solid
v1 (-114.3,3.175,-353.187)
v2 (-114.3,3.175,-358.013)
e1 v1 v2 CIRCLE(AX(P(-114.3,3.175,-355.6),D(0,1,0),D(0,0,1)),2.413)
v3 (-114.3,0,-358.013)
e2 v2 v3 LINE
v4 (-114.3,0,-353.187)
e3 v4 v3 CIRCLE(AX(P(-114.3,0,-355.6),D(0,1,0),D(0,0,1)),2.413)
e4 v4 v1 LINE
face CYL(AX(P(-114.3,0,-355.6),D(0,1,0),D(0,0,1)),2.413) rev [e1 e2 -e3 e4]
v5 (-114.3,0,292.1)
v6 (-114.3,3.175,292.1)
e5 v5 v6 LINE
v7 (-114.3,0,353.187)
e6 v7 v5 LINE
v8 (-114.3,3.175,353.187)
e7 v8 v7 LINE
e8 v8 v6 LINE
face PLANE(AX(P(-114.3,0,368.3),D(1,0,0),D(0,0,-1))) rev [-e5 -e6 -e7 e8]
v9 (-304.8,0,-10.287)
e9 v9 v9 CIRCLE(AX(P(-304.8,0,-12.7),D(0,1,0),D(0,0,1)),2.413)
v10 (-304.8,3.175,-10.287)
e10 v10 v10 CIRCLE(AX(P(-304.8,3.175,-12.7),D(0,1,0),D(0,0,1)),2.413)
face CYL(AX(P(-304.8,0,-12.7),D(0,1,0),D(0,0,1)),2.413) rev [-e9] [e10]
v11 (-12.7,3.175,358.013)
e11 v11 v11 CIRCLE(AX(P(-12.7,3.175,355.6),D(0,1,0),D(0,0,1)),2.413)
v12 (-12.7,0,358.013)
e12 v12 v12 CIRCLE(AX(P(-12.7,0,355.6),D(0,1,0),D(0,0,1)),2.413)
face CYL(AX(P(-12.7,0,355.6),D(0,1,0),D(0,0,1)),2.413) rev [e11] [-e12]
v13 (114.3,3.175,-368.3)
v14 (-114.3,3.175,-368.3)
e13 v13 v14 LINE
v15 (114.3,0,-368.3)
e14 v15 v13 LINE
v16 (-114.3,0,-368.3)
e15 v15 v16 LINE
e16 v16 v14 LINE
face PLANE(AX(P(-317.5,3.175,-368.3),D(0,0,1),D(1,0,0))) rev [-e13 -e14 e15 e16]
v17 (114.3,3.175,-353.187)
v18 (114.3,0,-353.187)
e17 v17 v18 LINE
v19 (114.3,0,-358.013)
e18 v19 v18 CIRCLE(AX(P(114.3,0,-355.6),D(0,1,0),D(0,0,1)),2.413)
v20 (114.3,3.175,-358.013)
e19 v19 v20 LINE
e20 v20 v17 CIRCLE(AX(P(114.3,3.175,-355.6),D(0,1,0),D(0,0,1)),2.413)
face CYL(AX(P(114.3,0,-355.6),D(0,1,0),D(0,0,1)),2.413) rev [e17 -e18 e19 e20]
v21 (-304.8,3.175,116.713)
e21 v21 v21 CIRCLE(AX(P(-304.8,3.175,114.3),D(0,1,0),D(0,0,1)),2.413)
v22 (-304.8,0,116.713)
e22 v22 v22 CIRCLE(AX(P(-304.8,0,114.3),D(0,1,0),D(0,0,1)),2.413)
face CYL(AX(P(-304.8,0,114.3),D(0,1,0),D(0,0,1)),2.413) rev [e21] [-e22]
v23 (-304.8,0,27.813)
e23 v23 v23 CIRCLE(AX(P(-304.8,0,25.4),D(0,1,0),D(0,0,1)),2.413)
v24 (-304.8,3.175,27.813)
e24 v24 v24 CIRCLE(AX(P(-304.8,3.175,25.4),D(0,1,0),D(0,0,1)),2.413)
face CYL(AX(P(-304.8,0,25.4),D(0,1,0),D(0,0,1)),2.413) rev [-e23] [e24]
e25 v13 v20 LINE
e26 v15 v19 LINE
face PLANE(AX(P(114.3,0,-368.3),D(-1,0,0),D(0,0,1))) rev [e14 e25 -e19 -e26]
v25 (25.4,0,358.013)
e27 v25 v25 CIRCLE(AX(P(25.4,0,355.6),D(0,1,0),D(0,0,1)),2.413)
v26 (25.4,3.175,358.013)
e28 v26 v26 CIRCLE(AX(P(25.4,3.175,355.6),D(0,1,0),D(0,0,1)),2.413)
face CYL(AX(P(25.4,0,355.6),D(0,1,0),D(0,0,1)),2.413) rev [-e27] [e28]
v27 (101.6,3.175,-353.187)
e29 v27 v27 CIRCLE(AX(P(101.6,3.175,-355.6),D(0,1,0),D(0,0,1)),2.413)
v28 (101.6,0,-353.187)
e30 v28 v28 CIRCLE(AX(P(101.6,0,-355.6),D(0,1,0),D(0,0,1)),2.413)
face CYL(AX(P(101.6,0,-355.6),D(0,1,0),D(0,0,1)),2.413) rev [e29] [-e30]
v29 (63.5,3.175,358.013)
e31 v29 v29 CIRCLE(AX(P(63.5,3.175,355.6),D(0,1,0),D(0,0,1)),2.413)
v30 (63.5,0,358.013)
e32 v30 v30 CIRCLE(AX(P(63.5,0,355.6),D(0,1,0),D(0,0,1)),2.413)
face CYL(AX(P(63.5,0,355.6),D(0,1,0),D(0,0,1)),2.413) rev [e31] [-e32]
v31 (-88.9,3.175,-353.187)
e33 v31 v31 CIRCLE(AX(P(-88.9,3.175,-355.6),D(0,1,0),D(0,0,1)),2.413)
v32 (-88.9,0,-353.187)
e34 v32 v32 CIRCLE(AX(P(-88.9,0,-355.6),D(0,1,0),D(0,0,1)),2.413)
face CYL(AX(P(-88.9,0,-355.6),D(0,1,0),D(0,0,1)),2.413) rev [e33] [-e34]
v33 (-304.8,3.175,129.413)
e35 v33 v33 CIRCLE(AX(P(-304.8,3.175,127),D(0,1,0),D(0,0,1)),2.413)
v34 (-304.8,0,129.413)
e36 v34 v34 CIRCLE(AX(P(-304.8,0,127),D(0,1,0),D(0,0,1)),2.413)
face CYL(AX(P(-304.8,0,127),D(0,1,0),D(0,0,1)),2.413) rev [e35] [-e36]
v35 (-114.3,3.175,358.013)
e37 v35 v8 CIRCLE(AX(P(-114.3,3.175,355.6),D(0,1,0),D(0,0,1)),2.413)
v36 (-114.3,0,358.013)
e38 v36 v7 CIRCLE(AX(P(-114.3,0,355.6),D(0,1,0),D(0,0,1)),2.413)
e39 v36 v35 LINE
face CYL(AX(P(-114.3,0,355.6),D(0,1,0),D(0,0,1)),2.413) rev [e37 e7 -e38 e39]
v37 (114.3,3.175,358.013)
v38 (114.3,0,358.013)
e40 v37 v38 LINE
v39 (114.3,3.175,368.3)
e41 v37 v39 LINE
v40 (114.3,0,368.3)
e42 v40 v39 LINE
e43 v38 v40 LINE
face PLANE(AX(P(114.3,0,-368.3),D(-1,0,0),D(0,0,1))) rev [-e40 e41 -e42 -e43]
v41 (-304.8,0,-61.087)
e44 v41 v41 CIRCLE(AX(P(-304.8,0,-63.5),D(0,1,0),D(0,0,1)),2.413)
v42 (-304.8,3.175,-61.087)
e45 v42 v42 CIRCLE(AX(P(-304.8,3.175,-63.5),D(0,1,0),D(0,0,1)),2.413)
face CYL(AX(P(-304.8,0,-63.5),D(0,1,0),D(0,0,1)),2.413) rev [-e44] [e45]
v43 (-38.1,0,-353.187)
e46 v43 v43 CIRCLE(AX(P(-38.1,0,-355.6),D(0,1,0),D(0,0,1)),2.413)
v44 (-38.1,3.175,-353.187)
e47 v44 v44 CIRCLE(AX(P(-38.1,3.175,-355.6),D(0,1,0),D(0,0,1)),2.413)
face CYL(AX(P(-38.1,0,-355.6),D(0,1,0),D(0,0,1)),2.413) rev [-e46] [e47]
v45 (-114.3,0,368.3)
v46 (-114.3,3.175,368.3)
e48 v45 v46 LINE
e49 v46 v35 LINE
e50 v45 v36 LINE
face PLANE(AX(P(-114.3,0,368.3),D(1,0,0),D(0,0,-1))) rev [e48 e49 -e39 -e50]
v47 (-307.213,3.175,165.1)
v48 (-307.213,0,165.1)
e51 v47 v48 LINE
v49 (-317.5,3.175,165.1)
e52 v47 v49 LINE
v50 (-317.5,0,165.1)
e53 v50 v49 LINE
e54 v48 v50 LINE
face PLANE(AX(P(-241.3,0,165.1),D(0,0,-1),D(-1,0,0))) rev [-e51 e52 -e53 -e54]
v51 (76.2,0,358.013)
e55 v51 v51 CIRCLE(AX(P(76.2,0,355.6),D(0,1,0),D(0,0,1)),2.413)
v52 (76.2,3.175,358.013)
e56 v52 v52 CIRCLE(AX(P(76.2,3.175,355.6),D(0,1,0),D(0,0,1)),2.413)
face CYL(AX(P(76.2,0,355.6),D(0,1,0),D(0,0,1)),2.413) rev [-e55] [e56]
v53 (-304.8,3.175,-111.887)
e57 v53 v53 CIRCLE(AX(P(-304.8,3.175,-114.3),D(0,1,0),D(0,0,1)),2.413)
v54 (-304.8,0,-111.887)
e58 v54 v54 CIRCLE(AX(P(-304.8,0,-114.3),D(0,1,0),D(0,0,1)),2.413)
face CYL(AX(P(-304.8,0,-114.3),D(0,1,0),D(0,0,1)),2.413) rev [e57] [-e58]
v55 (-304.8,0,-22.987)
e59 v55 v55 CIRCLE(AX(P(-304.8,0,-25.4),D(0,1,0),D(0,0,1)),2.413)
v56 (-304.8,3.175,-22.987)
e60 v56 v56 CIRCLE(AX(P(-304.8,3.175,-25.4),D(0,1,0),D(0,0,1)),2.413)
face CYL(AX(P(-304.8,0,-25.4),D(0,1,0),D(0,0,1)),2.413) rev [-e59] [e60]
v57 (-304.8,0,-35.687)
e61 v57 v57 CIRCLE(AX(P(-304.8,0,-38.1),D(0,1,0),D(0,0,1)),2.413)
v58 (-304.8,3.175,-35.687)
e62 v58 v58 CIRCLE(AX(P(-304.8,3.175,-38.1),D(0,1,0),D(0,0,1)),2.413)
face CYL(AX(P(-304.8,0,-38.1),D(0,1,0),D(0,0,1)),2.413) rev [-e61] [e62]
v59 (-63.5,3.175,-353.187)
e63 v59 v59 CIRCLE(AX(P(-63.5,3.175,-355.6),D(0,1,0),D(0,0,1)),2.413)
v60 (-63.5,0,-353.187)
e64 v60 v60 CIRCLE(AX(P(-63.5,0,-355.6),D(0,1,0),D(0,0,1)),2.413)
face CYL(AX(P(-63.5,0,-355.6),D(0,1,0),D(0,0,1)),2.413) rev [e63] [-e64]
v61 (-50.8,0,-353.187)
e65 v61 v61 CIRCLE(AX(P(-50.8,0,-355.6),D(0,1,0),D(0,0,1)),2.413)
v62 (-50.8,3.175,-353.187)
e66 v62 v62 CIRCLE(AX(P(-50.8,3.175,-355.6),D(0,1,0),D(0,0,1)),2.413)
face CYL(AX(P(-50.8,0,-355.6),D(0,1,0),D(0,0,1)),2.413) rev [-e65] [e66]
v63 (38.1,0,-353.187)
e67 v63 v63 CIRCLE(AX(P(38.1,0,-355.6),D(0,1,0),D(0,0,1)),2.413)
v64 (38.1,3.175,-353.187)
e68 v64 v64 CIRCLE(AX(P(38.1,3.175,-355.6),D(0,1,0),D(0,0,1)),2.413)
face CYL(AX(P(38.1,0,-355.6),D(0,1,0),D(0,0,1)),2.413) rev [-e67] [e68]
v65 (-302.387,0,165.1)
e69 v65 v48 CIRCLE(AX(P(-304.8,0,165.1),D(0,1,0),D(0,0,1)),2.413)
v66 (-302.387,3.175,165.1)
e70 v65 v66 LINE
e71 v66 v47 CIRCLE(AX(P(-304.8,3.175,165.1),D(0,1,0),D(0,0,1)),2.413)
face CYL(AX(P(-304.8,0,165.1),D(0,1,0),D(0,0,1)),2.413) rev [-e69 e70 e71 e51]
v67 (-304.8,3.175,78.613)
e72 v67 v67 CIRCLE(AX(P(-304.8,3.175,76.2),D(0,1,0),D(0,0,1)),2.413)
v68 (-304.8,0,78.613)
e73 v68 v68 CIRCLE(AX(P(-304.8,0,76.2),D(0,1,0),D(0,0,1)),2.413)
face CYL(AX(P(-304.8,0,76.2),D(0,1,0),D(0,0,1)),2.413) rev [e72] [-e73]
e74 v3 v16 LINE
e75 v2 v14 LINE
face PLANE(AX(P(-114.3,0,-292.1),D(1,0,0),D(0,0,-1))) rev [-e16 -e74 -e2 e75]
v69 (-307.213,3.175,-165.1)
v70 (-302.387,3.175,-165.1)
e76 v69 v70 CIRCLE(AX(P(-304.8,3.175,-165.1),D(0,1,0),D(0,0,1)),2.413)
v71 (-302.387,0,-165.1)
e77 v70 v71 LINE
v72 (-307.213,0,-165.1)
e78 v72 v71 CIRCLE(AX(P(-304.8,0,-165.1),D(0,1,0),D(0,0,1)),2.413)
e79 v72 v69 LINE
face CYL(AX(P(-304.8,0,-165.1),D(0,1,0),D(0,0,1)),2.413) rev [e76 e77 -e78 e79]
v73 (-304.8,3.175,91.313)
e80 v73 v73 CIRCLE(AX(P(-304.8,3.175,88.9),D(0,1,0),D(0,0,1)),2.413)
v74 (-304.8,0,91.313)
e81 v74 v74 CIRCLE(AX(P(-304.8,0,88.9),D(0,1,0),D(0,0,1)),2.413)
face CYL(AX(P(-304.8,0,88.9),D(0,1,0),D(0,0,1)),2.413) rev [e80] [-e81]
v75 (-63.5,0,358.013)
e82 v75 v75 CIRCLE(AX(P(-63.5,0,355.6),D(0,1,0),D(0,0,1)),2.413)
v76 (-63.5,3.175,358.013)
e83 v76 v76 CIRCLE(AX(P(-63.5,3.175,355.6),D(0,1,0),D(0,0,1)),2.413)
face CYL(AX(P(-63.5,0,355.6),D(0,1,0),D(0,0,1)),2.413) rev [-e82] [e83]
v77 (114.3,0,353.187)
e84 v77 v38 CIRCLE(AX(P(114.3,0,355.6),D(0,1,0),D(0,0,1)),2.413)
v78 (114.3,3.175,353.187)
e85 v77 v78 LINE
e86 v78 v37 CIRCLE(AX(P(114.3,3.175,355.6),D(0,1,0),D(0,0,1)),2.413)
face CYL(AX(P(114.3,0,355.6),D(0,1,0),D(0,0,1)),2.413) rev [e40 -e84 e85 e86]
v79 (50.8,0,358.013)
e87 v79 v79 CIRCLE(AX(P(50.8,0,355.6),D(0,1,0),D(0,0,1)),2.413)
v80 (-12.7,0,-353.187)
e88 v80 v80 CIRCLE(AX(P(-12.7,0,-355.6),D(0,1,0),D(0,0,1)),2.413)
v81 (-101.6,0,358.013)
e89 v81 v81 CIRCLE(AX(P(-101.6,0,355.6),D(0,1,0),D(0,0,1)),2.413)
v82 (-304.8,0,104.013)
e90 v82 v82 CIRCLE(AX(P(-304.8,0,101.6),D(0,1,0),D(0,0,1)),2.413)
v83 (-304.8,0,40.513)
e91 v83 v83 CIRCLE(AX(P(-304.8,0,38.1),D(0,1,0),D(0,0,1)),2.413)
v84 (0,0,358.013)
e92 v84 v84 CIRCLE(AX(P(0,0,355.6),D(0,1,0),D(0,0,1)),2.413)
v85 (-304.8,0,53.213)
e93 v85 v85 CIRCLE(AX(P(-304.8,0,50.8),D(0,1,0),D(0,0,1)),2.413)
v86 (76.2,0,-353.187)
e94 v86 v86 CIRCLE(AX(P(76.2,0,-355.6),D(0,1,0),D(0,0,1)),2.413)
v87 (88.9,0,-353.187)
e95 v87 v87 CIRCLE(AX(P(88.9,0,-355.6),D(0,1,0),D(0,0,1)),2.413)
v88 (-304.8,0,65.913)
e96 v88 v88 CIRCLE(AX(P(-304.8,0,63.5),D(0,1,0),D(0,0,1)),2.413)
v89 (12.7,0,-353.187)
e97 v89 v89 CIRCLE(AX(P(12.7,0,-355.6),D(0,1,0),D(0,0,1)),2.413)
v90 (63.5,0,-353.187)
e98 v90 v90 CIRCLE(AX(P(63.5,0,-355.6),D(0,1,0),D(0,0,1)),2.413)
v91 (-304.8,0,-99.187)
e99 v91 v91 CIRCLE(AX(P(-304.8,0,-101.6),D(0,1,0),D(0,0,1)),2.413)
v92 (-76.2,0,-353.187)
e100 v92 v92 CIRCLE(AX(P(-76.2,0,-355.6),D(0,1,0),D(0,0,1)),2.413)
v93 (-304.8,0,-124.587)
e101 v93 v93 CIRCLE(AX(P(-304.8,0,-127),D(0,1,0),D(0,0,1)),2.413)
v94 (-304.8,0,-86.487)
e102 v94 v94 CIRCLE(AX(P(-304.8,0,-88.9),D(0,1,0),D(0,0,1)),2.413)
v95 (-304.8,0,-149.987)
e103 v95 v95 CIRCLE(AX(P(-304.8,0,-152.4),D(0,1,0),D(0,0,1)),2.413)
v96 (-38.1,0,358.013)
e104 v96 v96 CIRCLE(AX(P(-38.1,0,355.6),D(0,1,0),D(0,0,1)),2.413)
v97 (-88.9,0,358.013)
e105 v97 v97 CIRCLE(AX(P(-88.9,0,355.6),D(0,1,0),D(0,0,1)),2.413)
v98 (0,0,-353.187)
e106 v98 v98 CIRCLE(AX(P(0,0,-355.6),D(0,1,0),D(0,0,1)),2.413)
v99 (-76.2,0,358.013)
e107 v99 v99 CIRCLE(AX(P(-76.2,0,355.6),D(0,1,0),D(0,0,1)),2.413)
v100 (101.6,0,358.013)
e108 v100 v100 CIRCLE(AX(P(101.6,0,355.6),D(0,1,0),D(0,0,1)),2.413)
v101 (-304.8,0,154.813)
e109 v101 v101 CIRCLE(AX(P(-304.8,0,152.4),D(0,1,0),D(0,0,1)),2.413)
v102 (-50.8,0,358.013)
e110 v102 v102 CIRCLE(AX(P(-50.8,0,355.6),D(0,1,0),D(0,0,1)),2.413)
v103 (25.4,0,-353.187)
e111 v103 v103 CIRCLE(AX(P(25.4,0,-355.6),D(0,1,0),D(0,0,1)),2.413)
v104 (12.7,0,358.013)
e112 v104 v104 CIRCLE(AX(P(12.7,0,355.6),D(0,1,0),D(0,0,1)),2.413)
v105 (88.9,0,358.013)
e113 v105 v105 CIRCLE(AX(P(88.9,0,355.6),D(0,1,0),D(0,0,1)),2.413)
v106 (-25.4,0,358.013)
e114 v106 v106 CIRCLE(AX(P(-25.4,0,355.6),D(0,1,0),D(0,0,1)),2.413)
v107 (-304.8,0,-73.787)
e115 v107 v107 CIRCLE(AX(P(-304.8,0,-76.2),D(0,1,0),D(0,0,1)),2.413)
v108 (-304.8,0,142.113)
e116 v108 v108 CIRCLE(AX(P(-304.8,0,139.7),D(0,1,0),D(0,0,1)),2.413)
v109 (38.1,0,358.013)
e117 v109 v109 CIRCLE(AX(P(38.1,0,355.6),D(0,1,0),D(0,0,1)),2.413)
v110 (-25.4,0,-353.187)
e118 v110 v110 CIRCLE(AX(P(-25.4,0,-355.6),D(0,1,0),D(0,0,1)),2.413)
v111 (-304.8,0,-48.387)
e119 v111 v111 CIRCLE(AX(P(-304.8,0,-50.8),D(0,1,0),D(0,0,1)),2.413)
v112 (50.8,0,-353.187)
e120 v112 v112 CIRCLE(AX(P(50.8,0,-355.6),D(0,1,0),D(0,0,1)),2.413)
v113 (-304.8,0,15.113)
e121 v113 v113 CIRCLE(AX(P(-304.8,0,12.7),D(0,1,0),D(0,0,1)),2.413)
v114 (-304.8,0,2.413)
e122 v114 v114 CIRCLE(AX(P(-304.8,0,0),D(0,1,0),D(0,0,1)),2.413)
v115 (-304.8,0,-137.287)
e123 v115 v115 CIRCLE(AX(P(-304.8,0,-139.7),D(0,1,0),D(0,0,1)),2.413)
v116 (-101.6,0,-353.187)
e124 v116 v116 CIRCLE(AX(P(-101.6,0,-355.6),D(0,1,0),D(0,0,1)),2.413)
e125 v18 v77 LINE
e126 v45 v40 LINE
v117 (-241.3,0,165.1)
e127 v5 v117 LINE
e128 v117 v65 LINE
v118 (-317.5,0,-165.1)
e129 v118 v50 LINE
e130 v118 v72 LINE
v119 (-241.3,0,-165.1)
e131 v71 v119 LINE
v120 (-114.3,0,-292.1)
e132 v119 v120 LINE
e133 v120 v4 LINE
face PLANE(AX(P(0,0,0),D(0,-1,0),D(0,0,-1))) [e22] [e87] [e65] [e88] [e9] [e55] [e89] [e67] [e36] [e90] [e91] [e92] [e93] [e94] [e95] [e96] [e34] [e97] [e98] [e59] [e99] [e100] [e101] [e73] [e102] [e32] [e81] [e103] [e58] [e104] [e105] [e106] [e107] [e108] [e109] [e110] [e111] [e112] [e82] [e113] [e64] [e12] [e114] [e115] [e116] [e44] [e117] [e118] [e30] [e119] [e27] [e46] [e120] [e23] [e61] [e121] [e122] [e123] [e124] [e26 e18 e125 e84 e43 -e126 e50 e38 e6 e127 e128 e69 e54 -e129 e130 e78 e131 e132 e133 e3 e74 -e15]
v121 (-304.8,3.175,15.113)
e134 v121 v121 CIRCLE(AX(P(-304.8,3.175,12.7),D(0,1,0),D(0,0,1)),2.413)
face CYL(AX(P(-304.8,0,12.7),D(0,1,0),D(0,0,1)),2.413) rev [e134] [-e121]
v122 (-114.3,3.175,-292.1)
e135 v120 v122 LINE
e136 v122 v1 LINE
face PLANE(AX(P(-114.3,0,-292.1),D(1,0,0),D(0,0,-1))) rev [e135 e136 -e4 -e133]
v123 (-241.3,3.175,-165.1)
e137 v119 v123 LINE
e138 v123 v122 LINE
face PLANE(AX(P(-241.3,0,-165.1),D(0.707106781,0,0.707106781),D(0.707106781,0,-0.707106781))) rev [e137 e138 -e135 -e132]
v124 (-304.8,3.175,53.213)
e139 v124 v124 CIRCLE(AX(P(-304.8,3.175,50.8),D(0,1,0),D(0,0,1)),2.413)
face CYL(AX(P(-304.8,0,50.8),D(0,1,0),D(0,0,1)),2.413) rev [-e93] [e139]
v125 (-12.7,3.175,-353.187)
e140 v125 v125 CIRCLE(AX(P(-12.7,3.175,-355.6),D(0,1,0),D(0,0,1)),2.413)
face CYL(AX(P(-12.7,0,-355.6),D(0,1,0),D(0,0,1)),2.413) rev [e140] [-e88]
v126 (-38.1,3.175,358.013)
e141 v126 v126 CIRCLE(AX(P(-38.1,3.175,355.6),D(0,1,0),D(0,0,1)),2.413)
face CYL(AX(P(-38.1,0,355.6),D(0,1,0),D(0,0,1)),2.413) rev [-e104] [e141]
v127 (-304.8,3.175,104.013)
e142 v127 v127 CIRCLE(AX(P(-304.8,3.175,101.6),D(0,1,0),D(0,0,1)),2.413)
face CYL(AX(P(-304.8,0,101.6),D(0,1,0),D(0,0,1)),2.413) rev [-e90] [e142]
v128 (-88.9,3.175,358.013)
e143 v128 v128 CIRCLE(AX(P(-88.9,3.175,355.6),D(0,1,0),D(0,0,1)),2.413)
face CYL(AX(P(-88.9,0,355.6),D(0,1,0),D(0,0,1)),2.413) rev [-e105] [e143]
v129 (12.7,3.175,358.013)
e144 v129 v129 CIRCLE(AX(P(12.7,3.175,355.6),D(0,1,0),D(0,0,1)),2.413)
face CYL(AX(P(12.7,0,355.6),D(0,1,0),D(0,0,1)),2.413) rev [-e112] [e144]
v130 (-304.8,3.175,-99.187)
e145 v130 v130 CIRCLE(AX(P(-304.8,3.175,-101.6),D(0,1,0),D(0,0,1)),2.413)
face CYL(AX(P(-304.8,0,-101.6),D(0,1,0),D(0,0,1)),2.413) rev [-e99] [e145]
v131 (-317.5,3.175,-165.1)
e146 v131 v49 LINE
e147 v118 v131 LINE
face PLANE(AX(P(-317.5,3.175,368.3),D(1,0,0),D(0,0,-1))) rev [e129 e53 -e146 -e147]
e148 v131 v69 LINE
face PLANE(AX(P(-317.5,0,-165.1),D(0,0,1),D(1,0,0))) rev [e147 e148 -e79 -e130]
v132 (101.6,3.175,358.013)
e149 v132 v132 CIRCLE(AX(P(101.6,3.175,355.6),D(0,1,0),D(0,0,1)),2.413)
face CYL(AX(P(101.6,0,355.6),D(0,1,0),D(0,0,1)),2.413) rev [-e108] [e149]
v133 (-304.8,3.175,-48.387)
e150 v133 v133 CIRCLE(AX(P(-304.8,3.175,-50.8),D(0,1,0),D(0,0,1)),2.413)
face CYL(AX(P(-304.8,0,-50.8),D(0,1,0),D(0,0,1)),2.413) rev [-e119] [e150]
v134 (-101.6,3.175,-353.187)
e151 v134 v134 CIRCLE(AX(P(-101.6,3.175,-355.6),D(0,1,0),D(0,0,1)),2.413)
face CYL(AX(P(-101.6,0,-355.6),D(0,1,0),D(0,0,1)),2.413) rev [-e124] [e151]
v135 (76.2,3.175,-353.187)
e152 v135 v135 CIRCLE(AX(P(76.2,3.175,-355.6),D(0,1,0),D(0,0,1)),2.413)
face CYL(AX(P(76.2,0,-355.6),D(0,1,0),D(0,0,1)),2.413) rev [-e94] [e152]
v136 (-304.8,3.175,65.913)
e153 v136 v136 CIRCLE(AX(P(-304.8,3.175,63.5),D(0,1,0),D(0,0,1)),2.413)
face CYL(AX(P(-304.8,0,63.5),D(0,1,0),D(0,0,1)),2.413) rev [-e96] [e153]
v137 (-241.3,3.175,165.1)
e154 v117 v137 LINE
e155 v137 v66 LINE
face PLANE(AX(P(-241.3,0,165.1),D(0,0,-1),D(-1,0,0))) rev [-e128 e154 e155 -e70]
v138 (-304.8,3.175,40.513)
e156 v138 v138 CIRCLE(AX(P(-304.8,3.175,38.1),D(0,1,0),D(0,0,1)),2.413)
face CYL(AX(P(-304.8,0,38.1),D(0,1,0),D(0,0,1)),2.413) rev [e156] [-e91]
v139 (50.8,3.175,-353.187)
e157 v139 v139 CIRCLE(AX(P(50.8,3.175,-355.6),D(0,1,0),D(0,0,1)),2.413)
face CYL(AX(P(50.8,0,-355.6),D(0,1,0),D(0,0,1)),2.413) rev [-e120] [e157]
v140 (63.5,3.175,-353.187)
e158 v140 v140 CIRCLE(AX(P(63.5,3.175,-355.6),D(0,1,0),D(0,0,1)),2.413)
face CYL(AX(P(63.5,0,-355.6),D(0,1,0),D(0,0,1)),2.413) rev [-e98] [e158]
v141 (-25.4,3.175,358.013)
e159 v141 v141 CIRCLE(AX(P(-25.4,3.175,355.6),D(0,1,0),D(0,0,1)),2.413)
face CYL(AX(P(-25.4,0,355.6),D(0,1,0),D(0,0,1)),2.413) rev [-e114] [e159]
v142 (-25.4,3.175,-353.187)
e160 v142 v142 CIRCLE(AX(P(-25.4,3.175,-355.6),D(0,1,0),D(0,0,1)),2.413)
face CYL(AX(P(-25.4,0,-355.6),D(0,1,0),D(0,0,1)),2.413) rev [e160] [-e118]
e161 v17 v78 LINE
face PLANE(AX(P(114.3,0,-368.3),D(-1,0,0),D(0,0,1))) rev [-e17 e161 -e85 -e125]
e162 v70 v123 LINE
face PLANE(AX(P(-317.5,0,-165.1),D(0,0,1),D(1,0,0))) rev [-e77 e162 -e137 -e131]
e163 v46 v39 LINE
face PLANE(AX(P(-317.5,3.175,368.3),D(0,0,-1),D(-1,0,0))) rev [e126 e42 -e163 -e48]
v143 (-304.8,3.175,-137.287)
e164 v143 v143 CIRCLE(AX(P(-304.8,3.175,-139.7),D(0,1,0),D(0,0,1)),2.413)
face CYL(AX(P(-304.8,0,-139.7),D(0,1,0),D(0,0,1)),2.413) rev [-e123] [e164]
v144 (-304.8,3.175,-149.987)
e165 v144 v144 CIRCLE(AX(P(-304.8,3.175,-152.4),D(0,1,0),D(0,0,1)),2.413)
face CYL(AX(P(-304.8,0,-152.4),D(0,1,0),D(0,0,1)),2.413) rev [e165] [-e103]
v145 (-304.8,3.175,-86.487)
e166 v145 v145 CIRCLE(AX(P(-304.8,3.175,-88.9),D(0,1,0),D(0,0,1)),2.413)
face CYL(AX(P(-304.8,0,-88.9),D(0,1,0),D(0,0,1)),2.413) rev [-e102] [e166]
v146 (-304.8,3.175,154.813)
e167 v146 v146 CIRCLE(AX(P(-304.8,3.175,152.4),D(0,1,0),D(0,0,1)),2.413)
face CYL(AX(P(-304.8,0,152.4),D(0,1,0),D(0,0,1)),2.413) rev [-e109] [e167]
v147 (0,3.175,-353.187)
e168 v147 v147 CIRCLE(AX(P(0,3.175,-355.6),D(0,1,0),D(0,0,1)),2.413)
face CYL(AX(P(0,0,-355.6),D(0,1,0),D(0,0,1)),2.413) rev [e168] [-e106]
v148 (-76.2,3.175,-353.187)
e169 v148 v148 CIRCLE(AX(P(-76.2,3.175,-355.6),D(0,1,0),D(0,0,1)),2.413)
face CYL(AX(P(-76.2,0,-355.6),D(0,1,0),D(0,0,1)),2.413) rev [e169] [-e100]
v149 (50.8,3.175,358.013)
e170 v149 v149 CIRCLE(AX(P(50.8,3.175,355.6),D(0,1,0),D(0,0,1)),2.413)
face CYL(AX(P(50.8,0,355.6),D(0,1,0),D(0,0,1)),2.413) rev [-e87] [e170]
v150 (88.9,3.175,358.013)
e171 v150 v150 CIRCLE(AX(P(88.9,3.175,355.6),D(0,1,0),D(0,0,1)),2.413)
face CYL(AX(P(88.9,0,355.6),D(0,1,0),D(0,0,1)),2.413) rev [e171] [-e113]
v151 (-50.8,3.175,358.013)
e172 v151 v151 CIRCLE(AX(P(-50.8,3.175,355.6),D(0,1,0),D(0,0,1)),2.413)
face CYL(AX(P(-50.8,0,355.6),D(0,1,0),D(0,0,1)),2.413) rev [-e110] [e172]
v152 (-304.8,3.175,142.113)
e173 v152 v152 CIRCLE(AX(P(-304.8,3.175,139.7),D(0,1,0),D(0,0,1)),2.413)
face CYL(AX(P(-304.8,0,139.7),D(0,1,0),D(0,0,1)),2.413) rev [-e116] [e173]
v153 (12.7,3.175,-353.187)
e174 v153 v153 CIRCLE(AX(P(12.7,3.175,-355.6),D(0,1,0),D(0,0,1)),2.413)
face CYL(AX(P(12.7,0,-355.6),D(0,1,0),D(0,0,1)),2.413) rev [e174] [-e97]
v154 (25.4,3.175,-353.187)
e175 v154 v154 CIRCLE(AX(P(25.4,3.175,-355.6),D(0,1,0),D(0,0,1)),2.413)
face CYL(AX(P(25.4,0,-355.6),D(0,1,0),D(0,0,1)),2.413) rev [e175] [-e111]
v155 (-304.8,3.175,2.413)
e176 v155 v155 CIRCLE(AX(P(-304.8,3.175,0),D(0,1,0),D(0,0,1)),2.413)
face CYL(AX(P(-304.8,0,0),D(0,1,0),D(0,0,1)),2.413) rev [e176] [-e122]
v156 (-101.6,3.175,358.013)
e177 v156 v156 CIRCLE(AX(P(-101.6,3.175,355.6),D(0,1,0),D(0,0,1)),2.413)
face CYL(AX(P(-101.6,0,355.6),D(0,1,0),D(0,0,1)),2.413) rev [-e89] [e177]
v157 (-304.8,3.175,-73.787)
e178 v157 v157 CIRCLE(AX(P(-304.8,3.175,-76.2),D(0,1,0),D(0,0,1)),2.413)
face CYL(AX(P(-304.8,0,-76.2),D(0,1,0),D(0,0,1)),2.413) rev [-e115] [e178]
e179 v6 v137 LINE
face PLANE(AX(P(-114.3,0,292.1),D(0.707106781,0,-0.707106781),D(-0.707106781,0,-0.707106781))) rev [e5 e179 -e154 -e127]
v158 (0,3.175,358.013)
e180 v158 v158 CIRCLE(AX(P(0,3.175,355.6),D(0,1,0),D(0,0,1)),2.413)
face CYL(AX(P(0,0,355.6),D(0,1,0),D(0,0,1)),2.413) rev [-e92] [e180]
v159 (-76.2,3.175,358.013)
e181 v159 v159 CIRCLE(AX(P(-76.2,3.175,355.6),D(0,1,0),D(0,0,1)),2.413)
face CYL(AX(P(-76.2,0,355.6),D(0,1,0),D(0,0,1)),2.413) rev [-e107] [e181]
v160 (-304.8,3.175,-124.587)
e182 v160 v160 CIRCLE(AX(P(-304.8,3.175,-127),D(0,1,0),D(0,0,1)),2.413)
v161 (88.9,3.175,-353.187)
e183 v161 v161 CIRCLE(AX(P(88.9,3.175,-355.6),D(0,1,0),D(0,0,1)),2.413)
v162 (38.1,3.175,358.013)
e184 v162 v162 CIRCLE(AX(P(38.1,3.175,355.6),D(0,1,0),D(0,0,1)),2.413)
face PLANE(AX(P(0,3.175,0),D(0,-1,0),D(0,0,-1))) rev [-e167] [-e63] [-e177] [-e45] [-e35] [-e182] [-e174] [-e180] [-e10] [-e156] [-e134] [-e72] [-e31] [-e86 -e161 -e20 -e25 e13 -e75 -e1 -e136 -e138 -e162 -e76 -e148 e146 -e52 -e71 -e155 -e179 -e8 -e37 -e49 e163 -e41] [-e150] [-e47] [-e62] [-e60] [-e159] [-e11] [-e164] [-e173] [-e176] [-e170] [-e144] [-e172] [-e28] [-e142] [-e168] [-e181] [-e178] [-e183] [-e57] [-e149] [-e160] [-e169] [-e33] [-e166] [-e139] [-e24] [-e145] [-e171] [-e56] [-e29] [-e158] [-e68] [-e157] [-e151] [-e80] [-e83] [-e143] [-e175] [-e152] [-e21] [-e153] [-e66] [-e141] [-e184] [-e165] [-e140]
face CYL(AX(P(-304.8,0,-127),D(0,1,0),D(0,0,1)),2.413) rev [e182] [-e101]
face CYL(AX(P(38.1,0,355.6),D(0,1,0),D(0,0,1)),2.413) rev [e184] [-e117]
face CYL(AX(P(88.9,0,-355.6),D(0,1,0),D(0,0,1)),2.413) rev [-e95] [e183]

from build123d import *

# Parameters (mm, degrees)
SKETCH1_W                  = 635
SKETCH1_H                  = 736.6
BASE_DEPTH                 = 3.175
SKETCH3_R                  = 2.413
INITIAL_PATTERN_HOLE_DEPTH = 487.272784171
HOLE_PATTERN_1_COUNT       = 58
HOLE_PATTERN_1_PITCH       = 12.7
HOLE_PATTERN_2_OUTLINE_R   = 2.413
HOLE_PATTERN_2_DEPTH       = 3.175
SKETCH4_W                  = 203.2
SKETCH4_H                  = 736.6
TOP_MODULE_CUTOUT_DEPTH    = 487.272784171


# Read off the part's stored shape, not the designer's step: Hole Pattern 2
with BuildPart() as part:
    # Sketch1 → Base (new body)
    with BuildSketch(Plane(origin=(0, 0, 0), x_dir=(1, 0, 0), z_dir=(0, 1, 0))):
        Rectangle(SKETCH1_W, SKETCH1_H)
    extrude(amount=BASE_DEPTH)

    # Sketch3 → Initial Pattern Hole (cut, through all)
    with BuildSketch(Plane(origin=(0, 3.175, 0), x_dir=(1, 0, 0), z_dir=(0, 1, 0))):
        with Locations(Location((-304.8, 355.6, 0), (0, 0, 270))):
            Circle(SKETCH3_R)
        with Locations(Location((304.8, 355.6, 0), (0, 0, 270))):
            Circle(SKETCH3_R)
    initial_pattern_hole = extrude(amount=-INITIAL_PATTERN_HOLE_DEPTH, mode=Mode.SUBTRACT)

    # Hole Pattern 1: Initial Pattern Hole ×58
    with Locations(*[(0, 0, i * HOLE_PATTERN_1_PITCH) for i in range(1, HOLE_PATTERN_1_COUNT)]):
        add(initial_pattern_hole, mode=Mode.SUBTRACT)

    # Hole Pattern 2 outline → Hole Pattern 2 (cut)
    with BuildSketch(Plane(origin=(0, 0, 0), x_dir=(1, 0, 0), z_dir=(0, 1, 0))):
        with Locations((292.1, 355.6)):
            Circle(HOLE_PATTERN_2_OUTLINE_R)
        with Locations((292.1, -355.6)):
            Circle(HOLE_PATTERN_2_OUTLINE_R)
        with Locations((279.4, 355.6)):
            Circle(HOLE_PATTERN_2_OUTLINE_R)
        with Locations((279.4, -355.6)):
            Circle(HOLE_PATTERN_2_OUTLINE_R)
        with Locations((266.7, 355.6)):
            Circle(HOLE_PATTERN_2_OUTLINE_R)
        with Locations((266.7, -355.6)):
            Circle(HOLE_PATTERN_2_OUTLINE_R)
        with Locations((254, 355.6)):
            Circle(HOLE_PATTERN_2_OUTLINE_R)
        with Locations((254, -355.6)):
            Circle(HOLE_PATTERN_2_OUTLINE_R)
        with Locations((241.3, 355.6)):
            Circle(HOLE_PATTERN_2_OUTLINE_R)
        with Locations((241.3, -355.6)):
            Circle(HOLE_PATTERN_2_OUTLINE_R)
        with Locations((228.6, 355.6)):
            Circle(HOLE_PATTERN_2_OUTLINE_R)
        with Locations((228.6, -355.6)):
            Circle(HOLE_PATTERN_2_OUTLINE_R)
        with Locations((215.9, 355.6)):
            Circle(HOLE_PATTERN_2_OUTLINE_R)
        with Locations((215.9, -355.6)):
            Circle(HOLE_PATTERN_2_OUTLINE_R)
        with Locations((203.2, 355.6)):
            Circle(HOLE_PATTERN_2_OUTLINE_R)
        with Locations((203.2, -355.6)):
            Circle(HOLE_PATTERN_2_OUTLINE_R)
        with Locations((190.5, 355.6)):
            Circle(HOLE_PATTERN_2_OUTLINE_R)
        with Locations((190.5, -355.6)):
            Circle(HOLE_PATTERN_2_OUTLINE_R)
        with Locations((177.8, 355.6)):
            Circle(HOLE_PATTERN_2_OUTLINE_R)
        with Locations((177.8, -355.6)):
            Circle(HOLE_PATTERN_2_OUTLINE_R)
        with Locations((165.1, 355.6)):
            Circle(HOLE_PATTERN_2_OUTLINE_R)
        with Locations((165.1, -355.6)):
            Circle(HOLE_PATTERN_2_OUTLINE_R)
        with Locations((152.4, 355.6)):
            Circle(HOLE_PATTERN_2_OUTLINE_R)
        with Locations((152.4, -355.6)):
            Circle(HOLE_PATTERN_2_OUTLINE_R)
        with Locations((139.7, 355.6)):
            Circle(HOLE_PATTERN_2_OUTLINE_R)
        with Locations((139.7, -355.6)):
            Circle(HOLE_PATTERN_2_OUTLINE_R)
        with Locations((127, 355.6)):
            Circle(HOLE_PATTERN_2_OUTLINE_R)
        with Locations((127, -355.6)):
            Circle(HOLE_PATTERN_2_OUTLINE_R)
        with Locations((114.3, 355.6)):
            Circle(HOLE_PATTERN_2_OUTLINE_R)
        with Locations((114.3, -355.6)):
            Circle(HOLE_PATTERN_2_OUTLINE_R)
        with Locations((101.6, 355.6)):
            Circle(HOLE_PATTERN_2_OUTLINE_R)
        with Locations((101.6, -355.6)):
            Circle(HOLE_PATTERN_2_OUTLINE_R)
        with Locations((88.9, 355.6)):
            Circle(HOLE_PATTERN_2_OUTLINE_R)
        with Locations((88.9, -355.6)):
            Circle(HOLE_PATTERN_2_OUTLINE_R)
        with Locations((76.2, 355.6)):
            Circle(HOLE_PATTERN_2_OUTLINE_R)
        with Locations((76.2, -355.6)):
            Circle(HOLE_PATTERN_2_OUTLINE_R)
        with Locations((63.5, 355.6)):
            Circle(HOLE_PATTERN_2_OUTLINE_R)
        with Locations((63.5, -355.6)):
            Circle(HOLE_PATTERN_2_OUTLINE_R)
        with Locations((50.8, 355.6)):
            Circle(HOLE_PATTERN_2_OUTLINE_R)
        with Locations((50.8, -355.6)):
            Circle(HOLE_PATTERN_2_OUTLINE_R)
        with Locations((38.1, 355.6)):
            Circle(HOLE_PATTERN_2_OUTLINE_R)
        with Locations((38.1, -355.6)):
            Circle(HOLE_PATTERN_2_OUTLINE_R)
        with Locations((25.4, 355.6)):
            Circle(HOLE_PATTERN_2_OUTLINE_R)
        with Locations((25.4, -355.6)):
            Circle(HOLE_PATTERN_2_OUTLINE_R)
        with Locations((12.7, 355.6)):
            Circle(HOLE_PATTERN_2_OUTLINE_R)
        with Locations((12.7, -355.6)):
            Circle(HOLE_PATTERN_2_OUTLINE_R)
        with Locations((0, 355.6)):
            Circle(HOLE_PATTERN_2_OUTLINE_R)
        with Locations((0, -355.6)):
            Circle(HOLE_PATTERN_2_OUTLINE_R)
        with Locations((-12.7, 355.6)):
            Circle(HOLE_PATTERN_2_OUTLINE_R)
        with Locations((-12.7, -355.6)):
            Circle(HOLE_PATTERN_2_OUTLINE_R)
        with Locations((-25.4, 355.6)):
            Circle(HOLE_PATTERN_2_OUTLINE_R)
        with Locations((-25.4, -355.6)):
            Circle(HOLE_PATTERN_2_OUTLINE_R)
        with Locations((-38.1, 355.6)):
            Circle(HOLE_PATTERN_2_OUTLINE_R)
        with Locations((-38.1, -355.6)):
            Circle(HOLE_PATTERN_2_OUTLINE_R)
        with Locations((-50.8, 355.6)):
            Circle(HOLE_PATTERN_2_OUTLINE_R)
        with Locations((-50.8, -355.6)):
            Circle(HOLE_PATTERN_2_OUTLINE_R)
        with Locations((-63.5, 355.6)):
            Circle(HOLE_PATTERN_2_OUTLINE_R)
        with Locations((-63.5, -355.6)):
            Circle(HOLE_PATTERN_2_OUTLINE_R)
        with Locations((-76.2, 355.6)):
            Circle(HOLE_PATTERN_2_OUTLINE_R)
        with Locations((-76.2, -355.6)):
            Circle(HOLE_PATTERN_2_OUTLINE_R)
        with Locations((-88.9, 355.6)):
            Circle(HOLE_PATTERN_2_OUTLINE_R)
        with Locations((-88.9, -355.6)):
            Circle(HOLE_PATTERN_2_OUTLINE_R)
        with Locations((-101.6, 355.6)):
            Circle(HOLE_PATTERN_2_OUTLINE_R)
        with Locations((-101.6, -355.6)):
            Circle(HOLE_PATTERN_2_OUTLINE_R)
        with Locations((-114.3, 355.6)):
            Circle(HOLE_PATTERN_2_OUTLINE_R)
        with Locations((-114.3, -355.6)):
            Circle(HOLE_PATTERN_2_OUTLINE_R)
        with Locations((-127, 355.6)):
            Circle(HOLE_PATTERN_2_OUTLINE_R)
        with Locations((-127, -355.6)):
            Circle(HOLE_PATTERN_2_OUTLINE_R)
        with Locations((-139.7, 355.6)):
            Circle(HOLE_PATTERN_2_OUTLINE_R)
        with Locations((-139.7, -355.6)):
            Circle(HOLE_PATTERN_2_OUTLINE_R)
        with Locations((-152.4, 355.6)):
            Circle(HOLE_PATTERN_2_OUTLINE_R)
        with Locations((-152.4, -355.6)):
            Circle(HOLE_PATTERN_2_OUTLINE_R)
        with Locations((-165.1, 355.6)):
            Circle(HOLE_PATTERN_2_OUTLINE_R)
        with Locations((-165.1, -355.6)):
            Circle(HOLE_PATTERN_2_OUTLINE_R)
        with Locations((-177.8, 355.6)):
            Circle(HOLE_PATTERN_2_OUTLINE_R)
        with Locations((-177.8, -355.6)):
            Circle(HOLE_PATTERN_2_OUTLINE_R)
        with Locations((-190.5, 355.6)):
            Circle(HOLE_PATTERN_2_OUTLINE_R)
        with Locations((-190.5, -355.6)):
            Circle(HOLE_PATTERN_2_OUTLINE_R)
        with Locations((-203.2, 355.6)):
            Circle(HOLE_PATTERN_2_OUTLINE_R)
        with Locations((-203.2, -355.6)):
            Circle(HOLE_PATTERN_2_OUTLINE_R)
        with Locations((-215.9, 355.6)):
            Circle(HOLE_PATTERN_2_OUTLINE_R)
        with Locations((-215.9, -355.6)):
            Circle(HOLE_PATTERN_2_OUTLINE_R)
        with Locations((-228.6, 355.6)):
            Circle(HOLE_PATTERN_2_OUTLINE_R)
        with Locations((-228.6, -355.6)):
            Circle(HOLE_PATTERN_2_OUTLINE_R)
        with Locations((-241.3, 355.6)):
            Circle(HOLE_PATTERN_2_OUTLINE_R)
        with Locations((-241.3, -355.6)):
            Circle(HOLE_PATTERN_2_OUTLINE_R)
        with Locations((-254, 355.6)):
            Circle(HOLE_PATTERN_2_OUTLINE_R)
        with Locations((-254, -355.6)):
            Circle(HOLE_PATTERN_2_OUTLINE_R)
        with Locations((-266.7, 355.6)):
            Circle(HOLE_PATTERN_2_OUTLINE_R)
        with Locations((-266.7, -355.6)):
            Circle(HOLE_PATTERN_2_OUTLINE_R)
        with Locations((-279.4, 355.6)):
            Circle(HOLE_PATTERN_2_OUTLINE_R)
        with Locations((-279.4, -355.6)):
            Circle(HOLE_PATTERN_2_OUTLINE_R)
        with Locations((-292.1, 355.6)):
            Circle(HOLE_PATTERN_2_OUTLINE_R)
        with Locations((-292.1, -355.6)):
            Circle(HOLE_PATTERN_2_OUTLINE_R)
    extrude(amount=HOLE_PATTERN_2_DEPTH, mode=Mode.SUBTRACT)

    # Sketch4 → Top Module Cutout (cut, through all)
    with BuildSketch(Plane(origin=(0, 3.175, 0), x_dir=(1, 0, 0), z_dir=(0, 1, 0))):
        Polygon((-317.5, 165.1), (-241.3, 165.1), (-114.3, 292.1), (-114.3, 368.3), (-317.5, 368.3), align=None)
        Polygon((-317.5, -368.3), (-114.3, -368.3), (-114.3, -292.1), (-241.3, -165.1), (-317.5, -165.1), align=None)
        with Locations((215.9, 0)):
            Rectangle(SKETCH4_W, SKETCH4_H)
    extrude(amount=-TOP_MODULE_CUTOUT_DEPTH, mode=Mode.SUBTRACT)


solid = part.part
